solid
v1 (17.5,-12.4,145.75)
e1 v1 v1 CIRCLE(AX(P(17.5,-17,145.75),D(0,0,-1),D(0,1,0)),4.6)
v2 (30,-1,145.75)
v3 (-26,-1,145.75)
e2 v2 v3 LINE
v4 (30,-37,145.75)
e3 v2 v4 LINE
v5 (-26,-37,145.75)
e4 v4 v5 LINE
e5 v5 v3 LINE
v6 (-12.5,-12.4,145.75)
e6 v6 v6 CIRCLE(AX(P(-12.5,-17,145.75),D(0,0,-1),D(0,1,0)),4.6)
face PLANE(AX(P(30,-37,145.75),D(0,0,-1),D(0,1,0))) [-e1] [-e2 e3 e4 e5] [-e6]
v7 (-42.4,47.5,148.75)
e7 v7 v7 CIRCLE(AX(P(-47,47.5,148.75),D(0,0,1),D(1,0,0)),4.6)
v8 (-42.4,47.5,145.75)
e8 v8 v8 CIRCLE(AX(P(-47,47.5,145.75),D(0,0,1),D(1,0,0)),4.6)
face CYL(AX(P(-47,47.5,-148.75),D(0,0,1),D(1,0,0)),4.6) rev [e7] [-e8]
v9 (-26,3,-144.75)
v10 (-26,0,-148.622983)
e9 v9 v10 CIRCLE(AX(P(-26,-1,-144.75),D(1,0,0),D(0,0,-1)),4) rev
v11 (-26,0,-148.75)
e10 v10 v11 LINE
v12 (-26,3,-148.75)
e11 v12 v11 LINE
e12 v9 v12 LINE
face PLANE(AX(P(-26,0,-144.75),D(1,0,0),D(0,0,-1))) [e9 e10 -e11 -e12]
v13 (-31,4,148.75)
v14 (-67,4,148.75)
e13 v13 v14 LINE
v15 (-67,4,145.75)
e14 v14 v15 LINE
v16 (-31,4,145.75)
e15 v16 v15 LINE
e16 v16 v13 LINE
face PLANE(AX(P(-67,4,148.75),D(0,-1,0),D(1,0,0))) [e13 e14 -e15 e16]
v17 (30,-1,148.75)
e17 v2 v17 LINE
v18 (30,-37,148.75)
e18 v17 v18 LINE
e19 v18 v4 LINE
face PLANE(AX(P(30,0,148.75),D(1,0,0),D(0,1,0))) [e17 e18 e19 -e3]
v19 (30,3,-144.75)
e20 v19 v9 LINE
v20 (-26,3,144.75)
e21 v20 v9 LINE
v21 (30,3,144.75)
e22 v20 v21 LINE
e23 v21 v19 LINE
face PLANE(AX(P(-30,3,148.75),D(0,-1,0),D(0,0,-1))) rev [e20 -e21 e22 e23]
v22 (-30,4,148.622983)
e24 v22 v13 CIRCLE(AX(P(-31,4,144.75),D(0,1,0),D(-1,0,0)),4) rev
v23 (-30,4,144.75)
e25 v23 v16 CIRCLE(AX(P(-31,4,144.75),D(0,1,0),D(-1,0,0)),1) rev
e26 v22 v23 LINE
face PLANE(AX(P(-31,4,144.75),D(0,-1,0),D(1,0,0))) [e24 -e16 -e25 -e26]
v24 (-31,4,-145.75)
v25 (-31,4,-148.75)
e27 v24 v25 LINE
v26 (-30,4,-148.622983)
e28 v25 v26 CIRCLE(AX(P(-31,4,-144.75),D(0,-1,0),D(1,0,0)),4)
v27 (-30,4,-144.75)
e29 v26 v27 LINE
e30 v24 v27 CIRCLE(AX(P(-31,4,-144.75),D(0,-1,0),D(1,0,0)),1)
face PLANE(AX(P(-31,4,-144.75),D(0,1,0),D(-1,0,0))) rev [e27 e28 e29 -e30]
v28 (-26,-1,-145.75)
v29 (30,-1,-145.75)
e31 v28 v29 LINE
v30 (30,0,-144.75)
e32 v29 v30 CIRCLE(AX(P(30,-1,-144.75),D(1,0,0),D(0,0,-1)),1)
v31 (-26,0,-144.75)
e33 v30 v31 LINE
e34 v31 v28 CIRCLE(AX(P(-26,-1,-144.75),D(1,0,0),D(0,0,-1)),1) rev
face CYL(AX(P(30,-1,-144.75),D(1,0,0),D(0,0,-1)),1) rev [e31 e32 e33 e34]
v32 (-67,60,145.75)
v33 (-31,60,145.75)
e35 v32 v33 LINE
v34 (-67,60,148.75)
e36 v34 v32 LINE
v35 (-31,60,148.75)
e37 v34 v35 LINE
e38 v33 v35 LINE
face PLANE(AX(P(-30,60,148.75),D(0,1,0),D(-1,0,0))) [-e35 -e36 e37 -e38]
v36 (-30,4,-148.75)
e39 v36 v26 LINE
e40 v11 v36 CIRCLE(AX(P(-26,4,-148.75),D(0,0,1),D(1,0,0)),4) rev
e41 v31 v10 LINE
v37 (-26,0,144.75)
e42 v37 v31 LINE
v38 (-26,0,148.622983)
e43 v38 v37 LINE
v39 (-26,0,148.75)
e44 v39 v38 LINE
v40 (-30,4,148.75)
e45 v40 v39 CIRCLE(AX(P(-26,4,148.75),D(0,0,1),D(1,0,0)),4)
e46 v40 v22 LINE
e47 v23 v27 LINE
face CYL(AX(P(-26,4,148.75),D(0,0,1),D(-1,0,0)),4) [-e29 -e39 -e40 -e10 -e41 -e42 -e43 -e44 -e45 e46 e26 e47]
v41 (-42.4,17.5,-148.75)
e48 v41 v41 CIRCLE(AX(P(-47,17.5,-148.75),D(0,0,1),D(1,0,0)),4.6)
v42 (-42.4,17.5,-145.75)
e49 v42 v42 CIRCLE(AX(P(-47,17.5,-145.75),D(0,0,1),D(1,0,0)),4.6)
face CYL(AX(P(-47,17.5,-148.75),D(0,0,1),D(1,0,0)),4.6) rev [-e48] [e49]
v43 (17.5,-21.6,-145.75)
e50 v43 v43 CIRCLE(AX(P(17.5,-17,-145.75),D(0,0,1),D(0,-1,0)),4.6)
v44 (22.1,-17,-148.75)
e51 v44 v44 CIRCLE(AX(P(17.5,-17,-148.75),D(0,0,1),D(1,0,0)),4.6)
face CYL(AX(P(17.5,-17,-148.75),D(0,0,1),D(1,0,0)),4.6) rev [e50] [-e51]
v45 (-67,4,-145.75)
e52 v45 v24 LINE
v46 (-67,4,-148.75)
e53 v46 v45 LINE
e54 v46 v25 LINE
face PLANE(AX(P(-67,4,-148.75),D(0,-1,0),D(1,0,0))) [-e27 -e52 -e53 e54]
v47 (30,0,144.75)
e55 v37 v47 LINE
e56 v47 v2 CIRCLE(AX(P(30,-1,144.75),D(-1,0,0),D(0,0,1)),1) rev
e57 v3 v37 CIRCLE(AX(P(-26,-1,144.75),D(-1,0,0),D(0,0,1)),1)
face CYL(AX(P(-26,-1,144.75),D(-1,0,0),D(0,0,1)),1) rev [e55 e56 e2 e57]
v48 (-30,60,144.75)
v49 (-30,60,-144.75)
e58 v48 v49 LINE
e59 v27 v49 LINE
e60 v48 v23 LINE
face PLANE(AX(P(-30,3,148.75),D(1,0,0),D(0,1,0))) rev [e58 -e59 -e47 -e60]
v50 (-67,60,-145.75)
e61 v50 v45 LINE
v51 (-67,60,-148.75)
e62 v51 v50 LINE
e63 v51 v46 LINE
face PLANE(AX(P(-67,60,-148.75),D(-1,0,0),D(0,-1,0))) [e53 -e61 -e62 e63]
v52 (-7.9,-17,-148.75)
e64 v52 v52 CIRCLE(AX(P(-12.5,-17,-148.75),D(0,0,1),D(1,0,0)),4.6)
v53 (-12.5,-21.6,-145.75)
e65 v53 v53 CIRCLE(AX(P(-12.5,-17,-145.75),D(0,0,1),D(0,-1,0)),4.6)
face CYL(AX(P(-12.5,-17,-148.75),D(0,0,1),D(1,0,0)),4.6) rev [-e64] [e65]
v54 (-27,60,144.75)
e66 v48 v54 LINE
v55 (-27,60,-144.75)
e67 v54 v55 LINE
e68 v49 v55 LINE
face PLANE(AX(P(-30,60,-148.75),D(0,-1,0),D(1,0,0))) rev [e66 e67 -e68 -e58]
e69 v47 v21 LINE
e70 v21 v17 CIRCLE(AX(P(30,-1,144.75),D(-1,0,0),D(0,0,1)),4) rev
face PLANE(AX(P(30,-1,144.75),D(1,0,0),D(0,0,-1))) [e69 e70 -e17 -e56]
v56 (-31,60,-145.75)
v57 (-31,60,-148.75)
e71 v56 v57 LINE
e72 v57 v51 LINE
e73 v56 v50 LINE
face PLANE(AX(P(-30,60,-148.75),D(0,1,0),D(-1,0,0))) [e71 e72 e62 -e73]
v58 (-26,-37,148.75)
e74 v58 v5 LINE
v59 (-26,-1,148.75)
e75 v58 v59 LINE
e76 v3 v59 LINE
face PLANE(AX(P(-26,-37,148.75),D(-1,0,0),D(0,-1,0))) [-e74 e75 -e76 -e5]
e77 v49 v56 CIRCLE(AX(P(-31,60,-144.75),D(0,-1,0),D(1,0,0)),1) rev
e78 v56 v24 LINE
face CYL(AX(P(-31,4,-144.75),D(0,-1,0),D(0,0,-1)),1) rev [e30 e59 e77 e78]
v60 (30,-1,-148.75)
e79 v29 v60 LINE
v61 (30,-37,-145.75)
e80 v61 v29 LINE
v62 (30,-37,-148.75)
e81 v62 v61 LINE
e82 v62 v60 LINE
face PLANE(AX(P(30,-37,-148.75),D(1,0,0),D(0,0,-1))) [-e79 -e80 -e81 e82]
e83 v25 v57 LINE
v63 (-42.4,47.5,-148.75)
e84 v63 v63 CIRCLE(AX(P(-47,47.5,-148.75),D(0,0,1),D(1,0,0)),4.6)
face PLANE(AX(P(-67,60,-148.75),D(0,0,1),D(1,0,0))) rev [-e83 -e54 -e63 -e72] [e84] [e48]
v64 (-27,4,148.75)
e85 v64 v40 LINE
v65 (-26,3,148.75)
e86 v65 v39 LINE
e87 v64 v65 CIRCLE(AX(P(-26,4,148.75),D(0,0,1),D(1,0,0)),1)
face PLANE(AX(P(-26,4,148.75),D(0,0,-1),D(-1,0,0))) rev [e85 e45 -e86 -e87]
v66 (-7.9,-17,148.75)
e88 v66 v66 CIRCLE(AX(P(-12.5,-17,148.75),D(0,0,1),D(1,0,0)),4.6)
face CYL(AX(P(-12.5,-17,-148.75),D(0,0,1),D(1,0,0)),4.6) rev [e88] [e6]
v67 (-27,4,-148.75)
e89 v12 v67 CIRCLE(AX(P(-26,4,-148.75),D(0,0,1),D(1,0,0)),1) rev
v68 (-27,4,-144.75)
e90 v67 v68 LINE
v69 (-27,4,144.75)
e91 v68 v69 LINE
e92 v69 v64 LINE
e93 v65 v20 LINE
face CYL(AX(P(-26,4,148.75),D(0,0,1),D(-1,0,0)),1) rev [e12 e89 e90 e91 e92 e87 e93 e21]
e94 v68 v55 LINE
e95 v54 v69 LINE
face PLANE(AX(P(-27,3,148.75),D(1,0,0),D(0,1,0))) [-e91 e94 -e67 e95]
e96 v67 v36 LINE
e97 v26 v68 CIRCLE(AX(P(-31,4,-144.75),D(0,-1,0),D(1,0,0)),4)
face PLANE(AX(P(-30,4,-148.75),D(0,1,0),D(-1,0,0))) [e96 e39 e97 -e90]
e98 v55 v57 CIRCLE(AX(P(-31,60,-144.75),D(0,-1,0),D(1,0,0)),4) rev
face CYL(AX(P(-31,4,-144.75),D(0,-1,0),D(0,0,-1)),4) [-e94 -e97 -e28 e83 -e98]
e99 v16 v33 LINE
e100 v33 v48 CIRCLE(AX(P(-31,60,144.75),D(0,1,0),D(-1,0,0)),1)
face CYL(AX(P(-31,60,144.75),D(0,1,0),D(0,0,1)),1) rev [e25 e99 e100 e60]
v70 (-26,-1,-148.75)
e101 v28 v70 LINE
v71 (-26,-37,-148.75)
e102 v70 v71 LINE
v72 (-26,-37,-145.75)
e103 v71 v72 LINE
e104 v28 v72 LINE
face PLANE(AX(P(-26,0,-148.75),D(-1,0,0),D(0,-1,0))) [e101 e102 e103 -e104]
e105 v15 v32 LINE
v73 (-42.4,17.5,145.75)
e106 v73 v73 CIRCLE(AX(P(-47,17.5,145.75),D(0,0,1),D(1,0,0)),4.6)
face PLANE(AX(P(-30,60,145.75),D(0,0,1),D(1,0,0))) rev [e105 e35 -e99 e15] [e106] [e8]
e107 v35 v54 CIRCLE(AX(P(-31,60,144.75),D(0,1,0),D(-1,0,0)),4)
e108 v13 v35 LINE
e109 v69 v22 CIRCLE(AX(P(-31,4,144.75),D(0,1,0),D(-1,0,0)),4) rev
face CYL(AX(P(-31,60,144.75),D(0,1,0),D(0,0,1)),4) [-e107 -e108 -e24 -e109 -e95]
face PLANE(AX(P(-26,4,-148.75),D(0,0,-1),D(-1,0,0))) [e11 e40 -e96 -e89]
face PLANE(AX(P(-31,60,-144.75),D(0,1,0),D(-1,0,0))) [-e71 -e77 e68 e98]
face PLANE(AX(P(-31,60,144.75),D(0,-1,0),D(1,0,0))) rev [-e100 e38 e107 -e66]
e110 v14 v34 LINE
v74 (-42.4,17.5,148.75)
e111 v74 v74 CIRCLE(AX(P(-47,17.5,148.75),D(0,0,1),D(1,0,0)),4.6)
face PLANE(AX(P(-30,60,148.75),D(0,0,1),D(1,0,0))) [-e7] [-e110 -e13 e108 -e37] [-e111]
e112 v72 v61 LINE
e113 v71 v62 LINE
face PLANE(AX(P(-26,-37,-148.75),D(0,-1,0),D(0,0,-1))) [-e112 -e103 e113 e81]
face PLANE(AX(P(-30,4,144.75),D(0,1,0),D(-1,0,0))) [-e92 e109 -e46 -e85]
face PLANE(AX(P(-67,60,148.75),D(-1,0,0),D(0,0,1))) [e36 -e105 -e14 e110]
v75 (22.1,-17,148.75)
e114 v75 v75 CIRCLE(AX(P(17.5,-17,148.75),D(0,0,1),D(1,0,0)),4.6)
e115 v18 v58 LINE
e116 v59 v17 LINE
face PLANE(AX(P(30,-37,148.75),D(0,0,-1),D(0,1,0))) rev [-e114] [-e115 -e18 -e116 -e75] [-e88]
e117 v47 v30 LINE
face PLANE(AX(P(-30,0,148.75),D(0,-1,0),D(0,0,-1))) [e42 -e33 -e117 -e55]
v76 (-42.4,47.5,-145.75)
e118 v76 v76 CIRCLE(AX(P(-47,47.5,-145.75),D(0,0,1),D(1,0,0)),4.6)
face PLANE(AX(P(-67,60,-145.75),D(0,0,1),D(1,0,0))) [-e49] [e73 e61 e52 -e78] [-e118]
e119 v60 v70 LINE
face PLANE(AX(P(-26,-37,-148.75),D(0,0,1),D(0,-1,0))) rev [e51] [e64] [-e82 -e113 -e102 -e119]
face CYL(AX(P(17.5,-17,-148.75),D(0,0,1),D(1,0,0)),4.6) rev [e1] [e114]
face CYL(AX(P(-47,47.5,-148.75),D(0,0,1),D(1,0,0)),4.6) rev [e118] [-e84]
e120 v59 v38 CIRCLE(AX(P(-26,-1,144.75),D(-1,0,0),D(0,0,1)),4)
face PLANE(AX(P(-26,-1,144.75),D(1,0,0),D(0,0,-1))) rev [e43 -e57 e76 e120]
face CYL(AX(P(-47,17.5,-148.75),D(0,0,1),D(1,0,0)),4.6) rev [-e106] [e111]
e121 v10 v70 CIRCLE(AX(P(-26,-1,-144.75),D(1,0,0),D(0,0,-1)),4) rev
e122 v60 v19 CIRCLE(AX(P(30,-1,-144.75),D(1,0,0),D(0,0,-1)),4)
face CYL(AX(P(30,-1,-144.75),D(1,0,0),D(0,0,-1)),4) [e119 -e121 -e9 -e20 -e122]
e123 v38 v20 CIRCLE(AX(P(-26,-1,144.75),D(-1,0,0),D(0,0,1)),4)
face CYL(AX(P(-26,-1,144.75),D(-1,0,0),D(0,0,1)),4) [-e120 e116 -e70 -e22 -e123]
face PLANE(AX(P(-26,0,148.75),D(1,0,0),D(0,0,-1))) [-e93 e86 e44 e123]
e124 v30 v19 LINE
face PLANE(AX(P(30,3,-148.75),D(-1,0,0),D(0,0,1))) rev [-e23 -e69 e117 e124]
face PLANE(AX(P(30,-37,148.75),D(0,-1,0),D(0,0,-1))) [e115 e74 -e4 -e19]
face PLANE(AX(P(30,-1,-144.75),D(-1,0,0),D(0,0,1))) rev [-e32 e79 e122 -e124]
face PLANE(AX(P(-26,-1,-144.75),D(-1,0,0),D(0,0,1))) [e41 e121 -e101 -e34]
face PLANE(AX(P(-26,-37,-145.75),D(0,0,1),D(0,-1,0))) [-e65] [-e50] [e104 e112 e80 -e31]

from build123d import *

# Parameters (mm, degrees)
SKETCH1_W                      = 60
SKETCH1_H                      = 297.5
BASE_FLANGE1_DEPTH             = 3
EDGE_FLANGE1_STRIP_W           = 14
EDGE_FLANGE1_STRIP_H           = 3
EDGE_FLANGE1_STRIP_CUT_DEPTH   = 297.5
EDGE_FLANGE1_DEPTH             = 297.5
EDGE_FLANGE2_STRIP_W           = 14
EDGE_FLANGE2_STRIP_H           = 3
EDGE_FLANGE2_STRIP_CUT_DEPTH   = 56
EDGE_FLANGE2_STRIP_2_W         = 14
EDGE_FLANGE2_STRIP_2_H         = 3
EDGE_FLANGE2_STRIP_CUT_2_DEPTH = 56
EDGE_FLANGE2_STRIP_3_W         = 14
EDGE_FLANGE2_STRIP_3_H         = 3
EDGE_FLANGE2_STRIP_CUT_3_DEPTH = 56
EDGE_FLANGE2_STRIP_4_W         = 14
EDGE_FLANGE2_STRIP_4_H         = 3
EDGE_FLANGE2_STRIP_CUT_4_DEPTH = 56
EDGE_FLANGE2_DEPTH             = 56
EDGE_FLANGE2_BEND_DEPTH        = 56
EDGE_FLANGE2_BEND_2_DEPTH      = 56
EDGE_FLANGE2_BEND_3_DEPTH      = 56
SKETCH18_R                     = 4.6
EXTRUDE1_DEPTH                 = 311.797763827


# Sheet-metal steps are written as plain solids
with BuildPart() as part:
    # Sketch1 → Base-Flange1 (new body)
    with BuildSketch(Plane(origin=(0, 0, 0), x_dir=(1, 0, 0), z_dir=(0, 1, 0))):
        Rectangle(SKETCH1_W, SKETCH1_H)
    extrude(amount=BASE_FLANGE1_DEPTH)

    # Edge-Flange1 strip (across the edge) → Edge-Flange1 strip cut (cut)
    with BuildSketch(Plane(origin=(-30, 3, -148.75), x_dir=(1, 0, 0), z_dir=(0, 0, 1))):
        with Locations((-3, -1.5)):
            Rectangle(EDGE_FLANGE1_STRIP_W, EDGE_FLANGE1_STRIP_H)
    extrude(amount=EDGE_FLANGE1_STRIP_CUT_DEPTH, mode=Mode.SUBTRACT)

    # Edge-Flange1 section (across the edge) → Edge-Flange1 (add)
    with BuildSketch(Plane(origin=(-30, 3, -148.75), x_dir=(1, 0, 0), z_dir=(0, 0, 1))):
        with BuildLine():
            Line((0, 1), (0, 57))
            Line((0, 57), (3, 57))
            Line((3, 57), (3, 1))
            ThreePointArc((3, 1), (3.292893219, 0.292893219), (4, 0))
            Line((4, 0), (4, -3))
            ThreePointArc((4, -3), (1.171572875, -1.828427125), (0, 1))
        make_face()
    extrude(amount=EDGE_FLANGE1_DEPTH)

    # Edge-Flange2 strip (across the edge) → Edge-Flange2 strip cut (cut)
    with BuildSketch(Plane(origin=(-30, 4, 148.75), x_dir=(0, 0, -1), z_dir=(0, 1, 0))):
        with Locations((-3, -1.5)):
            Rectangle(EDGE_FLANGE2_STRIP_W, EDGE_FLANGE2_STRIP_H)
    extrude(amount=EDGE_FLANGE2_STRIP_CUT_DEPTH, mode=Mode.SUBTRACT)

    # Edge-Flange2 strip 2 (across the edge) → Edge-Flange2 strip cut 2 (cut)
    with BuildSketch(Plane(origin=(30, 0, 148.75), x_dir=(0, 0, -1), z_dir=(-1, 0, 0))):
        with Locations((-3, -1.5)):
            Rectangle(EDGE_FLANGE2_STRIP_2_W, EDGE_FLANGE2_STRIP_2_H)
    extrude(amount=EDGE_FLANGE2_STRIP_CUT_2_DEPTH, mode=Mode.SUBTRACT)

    # Edge-Flange2 strip 3 (across the edge) → Edge-Flange2 strip cut 3 (cut)
    with BuildSketch(Plane(origin=(-30, 60, -148.75), x_dir=(0, 0, 1), z_dir=(0, -1, 0))):
        with Locations((-3, -1.5)):
            Rectangle(EDGE_FLANGE2_STRIP_3_W, EDGE_FLANGE2_STRIP_3_H)
    extrude(amount=EDGE_FLANGE2_STRIP_CUT_3_DEPTH, mode=Mode.SUBTRACT)

    # Edge-Flange2 strip 4 (across the edge) → Edge-Flange2 strip cut 4 (cut)
    with BuildSketch(Plane(origin=(-26, 0, -148.75), x_dir=(0, 0, 1), z_dir=(1, 0, 0))):
        with Locations((-3, -1.5)):
            Rectangle(EDGE_FLANGE2_STRIP_4_W, EDGE_FLANGE2_STRIP_4_H)
    extrude(amount=EDGE_FLANGE2_STRIP_CUT_4_DEPTH, mode=Mode.SUBTRACT)

    # Edge-Flange2 section (across the edge) → Edge-Flange2 (add)
    with BuildSketch(Plane(origin=(-30, 4, 148.75), x_dir=(0, 0, -1), z_dir=(0, 1, 0))):
        with BuildLine():
            Line((0, 1), (0, 37))
            Line((0, 37), (3, 37))
            Line((3, 37), (3, 1))
            ThreePointArc((3, 1), (3.292893219, 0.292893219), (4, 0))
            Line((4, 0), (4, -3))
            ThreePointArc((4, -3), (1.171572875, -1.828427125), (0, 1))
        make_face()
    extrude(amount=EDGE_FLANGE2_DEPTH)

    # Edge-Flange2 section 2 (across the edge) → Edge-Flange2 bend (add)
    with BuildSketch(Plane(origin=(30, 0, 148.75), x_dir=(0, 0, -1), z_dir=(-1, 0, 0))):
        with BuildLine():
            Line((0, 1), (0, 37))
            Line((0, 37), (3, 37))
            Line((3, 37), (3, 1))
            ThreePointArc((3, 1), (3.292893219, 0.292893219), (4, 0))
            Line((4, 0), (4, -3))
            ThreePointArc((4, -3), (1.171572875, -1.828427125), (0, 1))
        make_face()
    extrude(amount=EDGE_FLANGE2_BEND_DEPTH)

    # Edge-Flange2 section 3 (across the edge) → Edge-Flange2 bend 2 (add)
    with BuildSketch(Plane(origin=(-30, 60, -148.75), x_dir=(0, 0, 1), z_dir=(0, -1, 0))):
        with BuildLine():
            Line((0, 1), (0, 37))
            Line((0, 37), (3, 37))
            Line((3, 37), (3, 1))
            ThreePointArc((3, 1), (3.292893219, 0.292893219), (4, 0))
            Line((4, 0), (4, -3))
            ThreePointArc((4, -3), (1.171572875, -1.828427125), (0, 1))
        make_face()
    extrude(amount=EDGE_FLANGE2_BEND_2_DEPTH)

    # Edge-Flange2 section 4 (across the edge) → Edge-Flange2 bend 3 (add)
    with BuildSketch(Plane(origin=(-26, 0, -148.75), x_dir=(0, 0, 1), z_dir=(1, 0, 0))):
        with BuildLine():
            Line((0, 1), (0, 37))
            Line((0, 37), (3, 37))
            Line((3, 37), (3, 1))
            ThreePointArc((3, 1), (3.292893219, 0.292893219), (4, 0))
            Line((4, 0), (4, -3))
            ThreePointArc((4, -3), (1.171572875, -1.828427125), (0, 1))
        make_face()
    extrude(amount=EDGE_FLANGE2_BEND_3_DEPTH)

    # Sketch18 → Extrude1 (cut, through all)
    with BuildSketch(Plane.XY.offset(148.75)):
        with Locations((-47, 47.5)):
            Circle(SKETCH18_R)
        with Locations((-47, 17.5)):
            Circle(SKETCH18_R)
        with Locations((-12.5, -17)):
            Circle(SKETCH18_R)
        with Locations((17.5, -17)):
            Circle(SKETCH18_R)
    extrude(amount=-EXTRUDE1_DEPTH, mode=Mode.SUBTRACT)


solid = part.part
